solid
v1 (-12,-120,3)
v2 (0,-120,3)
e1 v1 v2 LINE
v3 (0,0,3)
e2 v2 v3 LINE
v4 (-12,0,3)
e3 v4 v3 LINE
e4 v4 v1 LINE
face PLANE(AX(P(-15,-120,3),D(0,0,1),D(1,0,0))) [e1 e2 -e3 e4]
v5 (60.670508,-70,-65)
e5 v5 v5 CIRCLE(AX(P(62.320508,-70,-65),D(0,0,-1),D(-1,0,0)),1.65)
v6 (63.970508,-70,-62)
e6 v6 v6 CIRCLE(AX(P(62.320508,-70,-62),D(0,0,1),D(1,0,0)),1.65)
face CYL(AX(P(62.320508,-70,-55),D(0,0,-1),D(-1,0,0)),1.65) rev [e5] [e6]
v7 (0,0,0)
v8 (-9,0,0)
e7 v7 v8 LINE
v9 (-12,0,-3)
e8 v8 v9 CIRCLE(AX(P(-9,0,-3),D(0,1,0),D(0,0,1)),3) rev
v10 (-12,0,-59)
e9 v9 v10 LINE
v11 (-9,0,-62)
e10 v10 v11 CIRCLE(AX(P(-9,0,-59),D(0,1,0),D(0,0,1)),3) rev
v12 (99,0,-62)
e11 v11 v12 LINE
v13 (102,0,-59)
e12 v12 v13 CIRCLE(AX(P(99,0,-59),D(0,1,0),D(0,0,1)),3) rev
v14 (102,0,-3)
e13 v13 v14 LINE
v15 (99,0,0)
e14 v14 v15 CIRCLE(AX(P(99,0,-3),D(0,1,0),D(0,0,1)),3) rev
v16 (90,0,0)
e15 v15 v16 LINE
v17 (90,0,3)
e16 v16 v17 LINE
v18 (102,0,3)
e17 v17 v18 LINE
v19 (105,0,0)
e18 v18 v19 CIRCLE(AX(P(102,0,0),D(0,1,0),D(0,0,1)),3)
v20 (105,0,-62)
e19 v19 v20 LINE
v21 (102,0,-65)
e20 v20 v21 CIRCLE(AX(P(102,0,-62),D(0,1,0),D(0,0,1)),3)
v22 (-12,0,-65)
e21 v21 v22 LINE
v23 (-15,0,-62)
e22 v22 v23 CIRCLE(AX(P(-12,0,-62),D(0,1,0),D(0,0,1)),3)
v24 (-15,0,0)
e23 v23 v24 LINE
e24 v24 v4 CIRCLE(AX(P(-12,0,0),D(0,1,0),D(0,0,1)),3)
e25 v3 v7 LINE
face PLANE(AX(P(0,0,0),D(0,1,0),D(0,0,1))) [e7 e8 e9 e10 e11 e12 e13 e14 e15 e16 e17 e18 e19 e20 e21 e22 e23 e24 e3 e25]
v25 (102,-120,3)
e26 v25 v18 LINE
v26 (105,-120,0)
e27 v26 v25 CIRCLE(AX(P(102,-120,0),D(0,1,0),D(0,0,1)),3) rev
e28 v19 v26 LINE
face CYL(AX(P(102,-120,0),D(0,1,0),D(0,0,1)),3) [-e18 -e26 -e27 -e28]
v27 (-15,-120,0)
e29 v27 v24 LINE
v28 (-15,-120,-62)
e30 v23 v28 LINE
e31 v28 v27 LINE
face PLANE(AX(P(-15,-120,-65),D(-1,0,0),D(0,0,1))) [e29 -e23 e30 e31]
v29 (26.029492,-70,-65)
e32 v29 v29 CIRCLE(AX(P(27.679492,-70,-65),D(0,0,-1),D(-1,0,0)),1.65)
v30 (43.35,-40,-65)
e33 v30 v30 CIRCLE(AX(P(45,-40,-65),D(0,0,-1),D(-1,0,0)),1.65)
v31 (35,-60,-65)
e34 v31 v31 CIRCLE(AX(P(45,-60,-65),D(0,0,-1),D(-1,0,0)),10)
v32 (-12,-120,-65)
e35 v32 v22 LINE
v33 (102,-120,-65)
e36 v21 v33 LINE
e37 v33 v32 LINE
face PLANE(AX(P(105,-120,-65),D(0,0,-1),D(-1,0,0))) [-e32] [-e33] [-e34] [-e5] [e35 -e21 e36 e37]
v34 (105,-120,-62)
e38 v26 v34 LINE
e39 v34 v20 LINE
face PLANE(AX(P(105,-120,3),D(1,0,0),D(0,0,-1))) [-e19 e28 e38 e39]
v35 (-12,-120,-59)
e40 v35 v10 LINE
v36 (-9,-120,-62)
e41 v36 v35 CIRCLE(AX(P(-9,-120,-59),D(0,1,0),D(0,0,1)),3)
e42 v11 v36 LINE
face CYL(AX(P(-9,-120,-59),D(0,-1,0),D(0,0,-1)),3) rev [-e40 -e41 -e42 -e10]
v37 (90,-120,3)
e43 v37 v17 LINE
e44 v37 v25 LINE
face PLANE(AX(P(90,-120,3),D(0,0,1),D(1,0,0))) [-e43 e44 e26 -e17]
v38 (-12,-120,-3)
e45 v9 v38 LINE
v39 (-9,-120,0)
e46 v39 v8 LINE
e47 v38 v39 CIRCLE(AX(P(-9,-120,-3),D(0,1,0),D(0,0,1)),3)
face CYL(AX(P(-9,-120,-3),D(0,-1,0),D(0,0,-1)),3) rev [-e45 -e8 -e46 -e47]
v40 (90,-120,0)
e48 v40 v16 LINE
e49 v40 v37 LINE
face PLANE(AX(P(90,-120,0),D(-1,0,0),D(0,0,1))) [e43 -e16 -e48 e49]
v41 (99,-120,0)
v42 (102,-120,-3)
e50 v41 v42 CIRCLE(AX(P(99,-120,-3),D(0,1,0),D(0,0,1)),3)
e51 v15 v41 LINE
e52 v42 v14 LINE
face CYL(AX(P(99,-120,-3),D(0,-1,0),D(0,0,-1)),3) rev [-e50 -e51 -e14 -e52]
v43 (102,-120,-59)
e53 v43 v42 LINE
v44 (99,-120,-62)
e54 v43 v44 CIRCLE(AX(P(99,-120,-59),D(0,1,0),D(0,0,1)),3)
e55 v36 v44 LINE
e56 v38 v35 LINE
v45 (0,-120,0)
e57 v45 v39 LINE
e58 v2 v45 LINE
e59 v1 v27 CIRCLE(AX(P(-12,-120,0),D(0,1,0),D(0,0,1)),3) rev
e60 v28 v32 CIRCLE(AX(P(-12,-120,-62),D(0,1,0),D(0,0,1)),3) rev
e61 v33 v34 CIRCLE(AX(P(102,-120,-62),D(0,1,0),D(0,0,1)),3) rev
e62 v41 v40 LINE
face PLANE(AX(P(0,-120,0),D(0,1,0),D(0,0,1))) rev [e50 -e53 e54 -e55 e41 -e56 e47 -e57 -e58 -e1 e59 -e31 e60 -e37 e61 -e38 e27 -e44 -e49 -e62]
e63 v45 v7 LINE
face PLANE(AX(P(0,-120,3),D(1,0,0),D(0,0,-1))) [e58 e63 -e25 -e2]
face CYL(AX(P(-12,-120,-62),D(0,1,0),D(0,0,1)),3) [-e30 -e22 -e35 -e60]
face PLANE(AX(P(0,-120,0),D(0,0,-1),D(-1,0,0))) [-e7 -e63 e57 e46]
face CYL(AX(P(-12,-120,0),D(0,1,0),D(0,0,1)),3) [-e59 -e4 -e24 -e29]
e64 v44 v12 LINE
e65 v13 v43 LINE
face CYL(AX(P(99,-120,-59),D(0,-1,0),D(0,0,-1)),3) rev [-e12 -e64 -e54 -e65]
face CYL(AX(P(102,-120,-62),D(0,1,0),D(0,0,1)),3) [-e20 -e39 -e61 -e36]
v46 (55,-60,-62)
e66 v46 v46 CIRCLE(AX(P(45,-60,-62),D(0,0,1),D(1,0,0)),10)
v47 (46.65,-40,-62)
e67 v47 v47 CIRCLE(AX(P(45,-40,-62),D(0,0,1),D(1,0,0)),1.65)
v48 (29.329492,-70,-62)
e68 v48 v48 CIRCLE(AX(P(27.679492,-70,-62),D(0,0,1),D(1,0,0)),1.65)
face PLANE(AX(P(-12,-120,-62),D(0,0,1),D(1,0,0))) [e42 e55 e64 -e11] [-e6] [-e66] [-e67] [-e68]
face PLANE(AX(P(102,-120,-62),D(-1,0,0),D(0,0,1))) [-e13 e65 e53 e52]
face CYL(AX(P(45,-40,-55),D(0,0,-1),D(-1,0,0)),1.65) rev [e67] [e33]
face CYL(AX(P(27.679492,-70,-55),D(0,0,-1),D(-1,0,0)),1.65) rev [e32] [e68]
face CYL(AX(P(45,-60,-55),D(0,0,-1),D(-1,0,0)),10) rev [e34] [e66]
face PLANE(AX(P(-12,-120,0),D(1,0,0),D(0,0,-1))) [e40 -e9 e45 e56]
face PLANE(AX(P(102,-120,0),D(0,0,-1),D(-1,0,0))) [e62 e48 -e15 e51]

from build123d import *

# Parameters (mm, degrees)
SM_BASE_FLANGE_1_DEPTH = 120
SKETCH_6_R             = 10
SKETCH_6_R_2           = 1.65
CUT_EXTRUDE_1_DEPTH    = 10
FILLET_1_R             = 3


# Sheet-metal steps are written as plain solids
with BuildPart() as part:
    # Sketch 1 → 基体-法兰1 (new body)
    with BuildSketch(Plane(origin=(0, 0, 0), x_dir=(1, 0, 0), z_dir=(0, 1, 0))):
        Polygon((0, 0), (-12, 0), (-12, 62), (102, 62), (102, 0), (90, 0), (90, -3), (105, -3), (105, 65), (-15, 65), (-15, -3), (0, -3), align=None)
    extrude(amount=-SM_BASE_FLANGE_1_DEPTH)

    # 草图6 → 切除-拉伸1 (cut)
    with BuildSketch(Plane(origin=(0, 0, -65), x_dir=(-1, 0, 0), z_dir=(0, 0, -1))):
        with Locations((-45, -60)):
            Circle(SKETCH_6_R)
        with Locations((-62.320508076, -70)):
            Circle(SKETCH_6_R_2)
        with Locations((-45, -40)):
            Circle(SKETCH_6_R_2)
        with Locations((-27.679491924, -70)):
            Circle(SKETCH_6_R_2)
    extrude(amount=-CUT_EXTRUDE_1_DEPTH, mode=Mode.SUBTRACT)

    # 圆角1
    fillet_1_edges = [part.edges().sort_by_distance(p)[0] for p in [
        (-15, -60, 3),
        (-15, -60, -65),
        (105, -60, -65),
        (105, -60, 3),
        (102, -60, 0),
        (102, -60, -62),
        (-12, -60, -62),
        (-12, -60, 0),
    ]]
    fillet(fillet_1_edges, radius=FILLET_1_R)


solid = part.part
